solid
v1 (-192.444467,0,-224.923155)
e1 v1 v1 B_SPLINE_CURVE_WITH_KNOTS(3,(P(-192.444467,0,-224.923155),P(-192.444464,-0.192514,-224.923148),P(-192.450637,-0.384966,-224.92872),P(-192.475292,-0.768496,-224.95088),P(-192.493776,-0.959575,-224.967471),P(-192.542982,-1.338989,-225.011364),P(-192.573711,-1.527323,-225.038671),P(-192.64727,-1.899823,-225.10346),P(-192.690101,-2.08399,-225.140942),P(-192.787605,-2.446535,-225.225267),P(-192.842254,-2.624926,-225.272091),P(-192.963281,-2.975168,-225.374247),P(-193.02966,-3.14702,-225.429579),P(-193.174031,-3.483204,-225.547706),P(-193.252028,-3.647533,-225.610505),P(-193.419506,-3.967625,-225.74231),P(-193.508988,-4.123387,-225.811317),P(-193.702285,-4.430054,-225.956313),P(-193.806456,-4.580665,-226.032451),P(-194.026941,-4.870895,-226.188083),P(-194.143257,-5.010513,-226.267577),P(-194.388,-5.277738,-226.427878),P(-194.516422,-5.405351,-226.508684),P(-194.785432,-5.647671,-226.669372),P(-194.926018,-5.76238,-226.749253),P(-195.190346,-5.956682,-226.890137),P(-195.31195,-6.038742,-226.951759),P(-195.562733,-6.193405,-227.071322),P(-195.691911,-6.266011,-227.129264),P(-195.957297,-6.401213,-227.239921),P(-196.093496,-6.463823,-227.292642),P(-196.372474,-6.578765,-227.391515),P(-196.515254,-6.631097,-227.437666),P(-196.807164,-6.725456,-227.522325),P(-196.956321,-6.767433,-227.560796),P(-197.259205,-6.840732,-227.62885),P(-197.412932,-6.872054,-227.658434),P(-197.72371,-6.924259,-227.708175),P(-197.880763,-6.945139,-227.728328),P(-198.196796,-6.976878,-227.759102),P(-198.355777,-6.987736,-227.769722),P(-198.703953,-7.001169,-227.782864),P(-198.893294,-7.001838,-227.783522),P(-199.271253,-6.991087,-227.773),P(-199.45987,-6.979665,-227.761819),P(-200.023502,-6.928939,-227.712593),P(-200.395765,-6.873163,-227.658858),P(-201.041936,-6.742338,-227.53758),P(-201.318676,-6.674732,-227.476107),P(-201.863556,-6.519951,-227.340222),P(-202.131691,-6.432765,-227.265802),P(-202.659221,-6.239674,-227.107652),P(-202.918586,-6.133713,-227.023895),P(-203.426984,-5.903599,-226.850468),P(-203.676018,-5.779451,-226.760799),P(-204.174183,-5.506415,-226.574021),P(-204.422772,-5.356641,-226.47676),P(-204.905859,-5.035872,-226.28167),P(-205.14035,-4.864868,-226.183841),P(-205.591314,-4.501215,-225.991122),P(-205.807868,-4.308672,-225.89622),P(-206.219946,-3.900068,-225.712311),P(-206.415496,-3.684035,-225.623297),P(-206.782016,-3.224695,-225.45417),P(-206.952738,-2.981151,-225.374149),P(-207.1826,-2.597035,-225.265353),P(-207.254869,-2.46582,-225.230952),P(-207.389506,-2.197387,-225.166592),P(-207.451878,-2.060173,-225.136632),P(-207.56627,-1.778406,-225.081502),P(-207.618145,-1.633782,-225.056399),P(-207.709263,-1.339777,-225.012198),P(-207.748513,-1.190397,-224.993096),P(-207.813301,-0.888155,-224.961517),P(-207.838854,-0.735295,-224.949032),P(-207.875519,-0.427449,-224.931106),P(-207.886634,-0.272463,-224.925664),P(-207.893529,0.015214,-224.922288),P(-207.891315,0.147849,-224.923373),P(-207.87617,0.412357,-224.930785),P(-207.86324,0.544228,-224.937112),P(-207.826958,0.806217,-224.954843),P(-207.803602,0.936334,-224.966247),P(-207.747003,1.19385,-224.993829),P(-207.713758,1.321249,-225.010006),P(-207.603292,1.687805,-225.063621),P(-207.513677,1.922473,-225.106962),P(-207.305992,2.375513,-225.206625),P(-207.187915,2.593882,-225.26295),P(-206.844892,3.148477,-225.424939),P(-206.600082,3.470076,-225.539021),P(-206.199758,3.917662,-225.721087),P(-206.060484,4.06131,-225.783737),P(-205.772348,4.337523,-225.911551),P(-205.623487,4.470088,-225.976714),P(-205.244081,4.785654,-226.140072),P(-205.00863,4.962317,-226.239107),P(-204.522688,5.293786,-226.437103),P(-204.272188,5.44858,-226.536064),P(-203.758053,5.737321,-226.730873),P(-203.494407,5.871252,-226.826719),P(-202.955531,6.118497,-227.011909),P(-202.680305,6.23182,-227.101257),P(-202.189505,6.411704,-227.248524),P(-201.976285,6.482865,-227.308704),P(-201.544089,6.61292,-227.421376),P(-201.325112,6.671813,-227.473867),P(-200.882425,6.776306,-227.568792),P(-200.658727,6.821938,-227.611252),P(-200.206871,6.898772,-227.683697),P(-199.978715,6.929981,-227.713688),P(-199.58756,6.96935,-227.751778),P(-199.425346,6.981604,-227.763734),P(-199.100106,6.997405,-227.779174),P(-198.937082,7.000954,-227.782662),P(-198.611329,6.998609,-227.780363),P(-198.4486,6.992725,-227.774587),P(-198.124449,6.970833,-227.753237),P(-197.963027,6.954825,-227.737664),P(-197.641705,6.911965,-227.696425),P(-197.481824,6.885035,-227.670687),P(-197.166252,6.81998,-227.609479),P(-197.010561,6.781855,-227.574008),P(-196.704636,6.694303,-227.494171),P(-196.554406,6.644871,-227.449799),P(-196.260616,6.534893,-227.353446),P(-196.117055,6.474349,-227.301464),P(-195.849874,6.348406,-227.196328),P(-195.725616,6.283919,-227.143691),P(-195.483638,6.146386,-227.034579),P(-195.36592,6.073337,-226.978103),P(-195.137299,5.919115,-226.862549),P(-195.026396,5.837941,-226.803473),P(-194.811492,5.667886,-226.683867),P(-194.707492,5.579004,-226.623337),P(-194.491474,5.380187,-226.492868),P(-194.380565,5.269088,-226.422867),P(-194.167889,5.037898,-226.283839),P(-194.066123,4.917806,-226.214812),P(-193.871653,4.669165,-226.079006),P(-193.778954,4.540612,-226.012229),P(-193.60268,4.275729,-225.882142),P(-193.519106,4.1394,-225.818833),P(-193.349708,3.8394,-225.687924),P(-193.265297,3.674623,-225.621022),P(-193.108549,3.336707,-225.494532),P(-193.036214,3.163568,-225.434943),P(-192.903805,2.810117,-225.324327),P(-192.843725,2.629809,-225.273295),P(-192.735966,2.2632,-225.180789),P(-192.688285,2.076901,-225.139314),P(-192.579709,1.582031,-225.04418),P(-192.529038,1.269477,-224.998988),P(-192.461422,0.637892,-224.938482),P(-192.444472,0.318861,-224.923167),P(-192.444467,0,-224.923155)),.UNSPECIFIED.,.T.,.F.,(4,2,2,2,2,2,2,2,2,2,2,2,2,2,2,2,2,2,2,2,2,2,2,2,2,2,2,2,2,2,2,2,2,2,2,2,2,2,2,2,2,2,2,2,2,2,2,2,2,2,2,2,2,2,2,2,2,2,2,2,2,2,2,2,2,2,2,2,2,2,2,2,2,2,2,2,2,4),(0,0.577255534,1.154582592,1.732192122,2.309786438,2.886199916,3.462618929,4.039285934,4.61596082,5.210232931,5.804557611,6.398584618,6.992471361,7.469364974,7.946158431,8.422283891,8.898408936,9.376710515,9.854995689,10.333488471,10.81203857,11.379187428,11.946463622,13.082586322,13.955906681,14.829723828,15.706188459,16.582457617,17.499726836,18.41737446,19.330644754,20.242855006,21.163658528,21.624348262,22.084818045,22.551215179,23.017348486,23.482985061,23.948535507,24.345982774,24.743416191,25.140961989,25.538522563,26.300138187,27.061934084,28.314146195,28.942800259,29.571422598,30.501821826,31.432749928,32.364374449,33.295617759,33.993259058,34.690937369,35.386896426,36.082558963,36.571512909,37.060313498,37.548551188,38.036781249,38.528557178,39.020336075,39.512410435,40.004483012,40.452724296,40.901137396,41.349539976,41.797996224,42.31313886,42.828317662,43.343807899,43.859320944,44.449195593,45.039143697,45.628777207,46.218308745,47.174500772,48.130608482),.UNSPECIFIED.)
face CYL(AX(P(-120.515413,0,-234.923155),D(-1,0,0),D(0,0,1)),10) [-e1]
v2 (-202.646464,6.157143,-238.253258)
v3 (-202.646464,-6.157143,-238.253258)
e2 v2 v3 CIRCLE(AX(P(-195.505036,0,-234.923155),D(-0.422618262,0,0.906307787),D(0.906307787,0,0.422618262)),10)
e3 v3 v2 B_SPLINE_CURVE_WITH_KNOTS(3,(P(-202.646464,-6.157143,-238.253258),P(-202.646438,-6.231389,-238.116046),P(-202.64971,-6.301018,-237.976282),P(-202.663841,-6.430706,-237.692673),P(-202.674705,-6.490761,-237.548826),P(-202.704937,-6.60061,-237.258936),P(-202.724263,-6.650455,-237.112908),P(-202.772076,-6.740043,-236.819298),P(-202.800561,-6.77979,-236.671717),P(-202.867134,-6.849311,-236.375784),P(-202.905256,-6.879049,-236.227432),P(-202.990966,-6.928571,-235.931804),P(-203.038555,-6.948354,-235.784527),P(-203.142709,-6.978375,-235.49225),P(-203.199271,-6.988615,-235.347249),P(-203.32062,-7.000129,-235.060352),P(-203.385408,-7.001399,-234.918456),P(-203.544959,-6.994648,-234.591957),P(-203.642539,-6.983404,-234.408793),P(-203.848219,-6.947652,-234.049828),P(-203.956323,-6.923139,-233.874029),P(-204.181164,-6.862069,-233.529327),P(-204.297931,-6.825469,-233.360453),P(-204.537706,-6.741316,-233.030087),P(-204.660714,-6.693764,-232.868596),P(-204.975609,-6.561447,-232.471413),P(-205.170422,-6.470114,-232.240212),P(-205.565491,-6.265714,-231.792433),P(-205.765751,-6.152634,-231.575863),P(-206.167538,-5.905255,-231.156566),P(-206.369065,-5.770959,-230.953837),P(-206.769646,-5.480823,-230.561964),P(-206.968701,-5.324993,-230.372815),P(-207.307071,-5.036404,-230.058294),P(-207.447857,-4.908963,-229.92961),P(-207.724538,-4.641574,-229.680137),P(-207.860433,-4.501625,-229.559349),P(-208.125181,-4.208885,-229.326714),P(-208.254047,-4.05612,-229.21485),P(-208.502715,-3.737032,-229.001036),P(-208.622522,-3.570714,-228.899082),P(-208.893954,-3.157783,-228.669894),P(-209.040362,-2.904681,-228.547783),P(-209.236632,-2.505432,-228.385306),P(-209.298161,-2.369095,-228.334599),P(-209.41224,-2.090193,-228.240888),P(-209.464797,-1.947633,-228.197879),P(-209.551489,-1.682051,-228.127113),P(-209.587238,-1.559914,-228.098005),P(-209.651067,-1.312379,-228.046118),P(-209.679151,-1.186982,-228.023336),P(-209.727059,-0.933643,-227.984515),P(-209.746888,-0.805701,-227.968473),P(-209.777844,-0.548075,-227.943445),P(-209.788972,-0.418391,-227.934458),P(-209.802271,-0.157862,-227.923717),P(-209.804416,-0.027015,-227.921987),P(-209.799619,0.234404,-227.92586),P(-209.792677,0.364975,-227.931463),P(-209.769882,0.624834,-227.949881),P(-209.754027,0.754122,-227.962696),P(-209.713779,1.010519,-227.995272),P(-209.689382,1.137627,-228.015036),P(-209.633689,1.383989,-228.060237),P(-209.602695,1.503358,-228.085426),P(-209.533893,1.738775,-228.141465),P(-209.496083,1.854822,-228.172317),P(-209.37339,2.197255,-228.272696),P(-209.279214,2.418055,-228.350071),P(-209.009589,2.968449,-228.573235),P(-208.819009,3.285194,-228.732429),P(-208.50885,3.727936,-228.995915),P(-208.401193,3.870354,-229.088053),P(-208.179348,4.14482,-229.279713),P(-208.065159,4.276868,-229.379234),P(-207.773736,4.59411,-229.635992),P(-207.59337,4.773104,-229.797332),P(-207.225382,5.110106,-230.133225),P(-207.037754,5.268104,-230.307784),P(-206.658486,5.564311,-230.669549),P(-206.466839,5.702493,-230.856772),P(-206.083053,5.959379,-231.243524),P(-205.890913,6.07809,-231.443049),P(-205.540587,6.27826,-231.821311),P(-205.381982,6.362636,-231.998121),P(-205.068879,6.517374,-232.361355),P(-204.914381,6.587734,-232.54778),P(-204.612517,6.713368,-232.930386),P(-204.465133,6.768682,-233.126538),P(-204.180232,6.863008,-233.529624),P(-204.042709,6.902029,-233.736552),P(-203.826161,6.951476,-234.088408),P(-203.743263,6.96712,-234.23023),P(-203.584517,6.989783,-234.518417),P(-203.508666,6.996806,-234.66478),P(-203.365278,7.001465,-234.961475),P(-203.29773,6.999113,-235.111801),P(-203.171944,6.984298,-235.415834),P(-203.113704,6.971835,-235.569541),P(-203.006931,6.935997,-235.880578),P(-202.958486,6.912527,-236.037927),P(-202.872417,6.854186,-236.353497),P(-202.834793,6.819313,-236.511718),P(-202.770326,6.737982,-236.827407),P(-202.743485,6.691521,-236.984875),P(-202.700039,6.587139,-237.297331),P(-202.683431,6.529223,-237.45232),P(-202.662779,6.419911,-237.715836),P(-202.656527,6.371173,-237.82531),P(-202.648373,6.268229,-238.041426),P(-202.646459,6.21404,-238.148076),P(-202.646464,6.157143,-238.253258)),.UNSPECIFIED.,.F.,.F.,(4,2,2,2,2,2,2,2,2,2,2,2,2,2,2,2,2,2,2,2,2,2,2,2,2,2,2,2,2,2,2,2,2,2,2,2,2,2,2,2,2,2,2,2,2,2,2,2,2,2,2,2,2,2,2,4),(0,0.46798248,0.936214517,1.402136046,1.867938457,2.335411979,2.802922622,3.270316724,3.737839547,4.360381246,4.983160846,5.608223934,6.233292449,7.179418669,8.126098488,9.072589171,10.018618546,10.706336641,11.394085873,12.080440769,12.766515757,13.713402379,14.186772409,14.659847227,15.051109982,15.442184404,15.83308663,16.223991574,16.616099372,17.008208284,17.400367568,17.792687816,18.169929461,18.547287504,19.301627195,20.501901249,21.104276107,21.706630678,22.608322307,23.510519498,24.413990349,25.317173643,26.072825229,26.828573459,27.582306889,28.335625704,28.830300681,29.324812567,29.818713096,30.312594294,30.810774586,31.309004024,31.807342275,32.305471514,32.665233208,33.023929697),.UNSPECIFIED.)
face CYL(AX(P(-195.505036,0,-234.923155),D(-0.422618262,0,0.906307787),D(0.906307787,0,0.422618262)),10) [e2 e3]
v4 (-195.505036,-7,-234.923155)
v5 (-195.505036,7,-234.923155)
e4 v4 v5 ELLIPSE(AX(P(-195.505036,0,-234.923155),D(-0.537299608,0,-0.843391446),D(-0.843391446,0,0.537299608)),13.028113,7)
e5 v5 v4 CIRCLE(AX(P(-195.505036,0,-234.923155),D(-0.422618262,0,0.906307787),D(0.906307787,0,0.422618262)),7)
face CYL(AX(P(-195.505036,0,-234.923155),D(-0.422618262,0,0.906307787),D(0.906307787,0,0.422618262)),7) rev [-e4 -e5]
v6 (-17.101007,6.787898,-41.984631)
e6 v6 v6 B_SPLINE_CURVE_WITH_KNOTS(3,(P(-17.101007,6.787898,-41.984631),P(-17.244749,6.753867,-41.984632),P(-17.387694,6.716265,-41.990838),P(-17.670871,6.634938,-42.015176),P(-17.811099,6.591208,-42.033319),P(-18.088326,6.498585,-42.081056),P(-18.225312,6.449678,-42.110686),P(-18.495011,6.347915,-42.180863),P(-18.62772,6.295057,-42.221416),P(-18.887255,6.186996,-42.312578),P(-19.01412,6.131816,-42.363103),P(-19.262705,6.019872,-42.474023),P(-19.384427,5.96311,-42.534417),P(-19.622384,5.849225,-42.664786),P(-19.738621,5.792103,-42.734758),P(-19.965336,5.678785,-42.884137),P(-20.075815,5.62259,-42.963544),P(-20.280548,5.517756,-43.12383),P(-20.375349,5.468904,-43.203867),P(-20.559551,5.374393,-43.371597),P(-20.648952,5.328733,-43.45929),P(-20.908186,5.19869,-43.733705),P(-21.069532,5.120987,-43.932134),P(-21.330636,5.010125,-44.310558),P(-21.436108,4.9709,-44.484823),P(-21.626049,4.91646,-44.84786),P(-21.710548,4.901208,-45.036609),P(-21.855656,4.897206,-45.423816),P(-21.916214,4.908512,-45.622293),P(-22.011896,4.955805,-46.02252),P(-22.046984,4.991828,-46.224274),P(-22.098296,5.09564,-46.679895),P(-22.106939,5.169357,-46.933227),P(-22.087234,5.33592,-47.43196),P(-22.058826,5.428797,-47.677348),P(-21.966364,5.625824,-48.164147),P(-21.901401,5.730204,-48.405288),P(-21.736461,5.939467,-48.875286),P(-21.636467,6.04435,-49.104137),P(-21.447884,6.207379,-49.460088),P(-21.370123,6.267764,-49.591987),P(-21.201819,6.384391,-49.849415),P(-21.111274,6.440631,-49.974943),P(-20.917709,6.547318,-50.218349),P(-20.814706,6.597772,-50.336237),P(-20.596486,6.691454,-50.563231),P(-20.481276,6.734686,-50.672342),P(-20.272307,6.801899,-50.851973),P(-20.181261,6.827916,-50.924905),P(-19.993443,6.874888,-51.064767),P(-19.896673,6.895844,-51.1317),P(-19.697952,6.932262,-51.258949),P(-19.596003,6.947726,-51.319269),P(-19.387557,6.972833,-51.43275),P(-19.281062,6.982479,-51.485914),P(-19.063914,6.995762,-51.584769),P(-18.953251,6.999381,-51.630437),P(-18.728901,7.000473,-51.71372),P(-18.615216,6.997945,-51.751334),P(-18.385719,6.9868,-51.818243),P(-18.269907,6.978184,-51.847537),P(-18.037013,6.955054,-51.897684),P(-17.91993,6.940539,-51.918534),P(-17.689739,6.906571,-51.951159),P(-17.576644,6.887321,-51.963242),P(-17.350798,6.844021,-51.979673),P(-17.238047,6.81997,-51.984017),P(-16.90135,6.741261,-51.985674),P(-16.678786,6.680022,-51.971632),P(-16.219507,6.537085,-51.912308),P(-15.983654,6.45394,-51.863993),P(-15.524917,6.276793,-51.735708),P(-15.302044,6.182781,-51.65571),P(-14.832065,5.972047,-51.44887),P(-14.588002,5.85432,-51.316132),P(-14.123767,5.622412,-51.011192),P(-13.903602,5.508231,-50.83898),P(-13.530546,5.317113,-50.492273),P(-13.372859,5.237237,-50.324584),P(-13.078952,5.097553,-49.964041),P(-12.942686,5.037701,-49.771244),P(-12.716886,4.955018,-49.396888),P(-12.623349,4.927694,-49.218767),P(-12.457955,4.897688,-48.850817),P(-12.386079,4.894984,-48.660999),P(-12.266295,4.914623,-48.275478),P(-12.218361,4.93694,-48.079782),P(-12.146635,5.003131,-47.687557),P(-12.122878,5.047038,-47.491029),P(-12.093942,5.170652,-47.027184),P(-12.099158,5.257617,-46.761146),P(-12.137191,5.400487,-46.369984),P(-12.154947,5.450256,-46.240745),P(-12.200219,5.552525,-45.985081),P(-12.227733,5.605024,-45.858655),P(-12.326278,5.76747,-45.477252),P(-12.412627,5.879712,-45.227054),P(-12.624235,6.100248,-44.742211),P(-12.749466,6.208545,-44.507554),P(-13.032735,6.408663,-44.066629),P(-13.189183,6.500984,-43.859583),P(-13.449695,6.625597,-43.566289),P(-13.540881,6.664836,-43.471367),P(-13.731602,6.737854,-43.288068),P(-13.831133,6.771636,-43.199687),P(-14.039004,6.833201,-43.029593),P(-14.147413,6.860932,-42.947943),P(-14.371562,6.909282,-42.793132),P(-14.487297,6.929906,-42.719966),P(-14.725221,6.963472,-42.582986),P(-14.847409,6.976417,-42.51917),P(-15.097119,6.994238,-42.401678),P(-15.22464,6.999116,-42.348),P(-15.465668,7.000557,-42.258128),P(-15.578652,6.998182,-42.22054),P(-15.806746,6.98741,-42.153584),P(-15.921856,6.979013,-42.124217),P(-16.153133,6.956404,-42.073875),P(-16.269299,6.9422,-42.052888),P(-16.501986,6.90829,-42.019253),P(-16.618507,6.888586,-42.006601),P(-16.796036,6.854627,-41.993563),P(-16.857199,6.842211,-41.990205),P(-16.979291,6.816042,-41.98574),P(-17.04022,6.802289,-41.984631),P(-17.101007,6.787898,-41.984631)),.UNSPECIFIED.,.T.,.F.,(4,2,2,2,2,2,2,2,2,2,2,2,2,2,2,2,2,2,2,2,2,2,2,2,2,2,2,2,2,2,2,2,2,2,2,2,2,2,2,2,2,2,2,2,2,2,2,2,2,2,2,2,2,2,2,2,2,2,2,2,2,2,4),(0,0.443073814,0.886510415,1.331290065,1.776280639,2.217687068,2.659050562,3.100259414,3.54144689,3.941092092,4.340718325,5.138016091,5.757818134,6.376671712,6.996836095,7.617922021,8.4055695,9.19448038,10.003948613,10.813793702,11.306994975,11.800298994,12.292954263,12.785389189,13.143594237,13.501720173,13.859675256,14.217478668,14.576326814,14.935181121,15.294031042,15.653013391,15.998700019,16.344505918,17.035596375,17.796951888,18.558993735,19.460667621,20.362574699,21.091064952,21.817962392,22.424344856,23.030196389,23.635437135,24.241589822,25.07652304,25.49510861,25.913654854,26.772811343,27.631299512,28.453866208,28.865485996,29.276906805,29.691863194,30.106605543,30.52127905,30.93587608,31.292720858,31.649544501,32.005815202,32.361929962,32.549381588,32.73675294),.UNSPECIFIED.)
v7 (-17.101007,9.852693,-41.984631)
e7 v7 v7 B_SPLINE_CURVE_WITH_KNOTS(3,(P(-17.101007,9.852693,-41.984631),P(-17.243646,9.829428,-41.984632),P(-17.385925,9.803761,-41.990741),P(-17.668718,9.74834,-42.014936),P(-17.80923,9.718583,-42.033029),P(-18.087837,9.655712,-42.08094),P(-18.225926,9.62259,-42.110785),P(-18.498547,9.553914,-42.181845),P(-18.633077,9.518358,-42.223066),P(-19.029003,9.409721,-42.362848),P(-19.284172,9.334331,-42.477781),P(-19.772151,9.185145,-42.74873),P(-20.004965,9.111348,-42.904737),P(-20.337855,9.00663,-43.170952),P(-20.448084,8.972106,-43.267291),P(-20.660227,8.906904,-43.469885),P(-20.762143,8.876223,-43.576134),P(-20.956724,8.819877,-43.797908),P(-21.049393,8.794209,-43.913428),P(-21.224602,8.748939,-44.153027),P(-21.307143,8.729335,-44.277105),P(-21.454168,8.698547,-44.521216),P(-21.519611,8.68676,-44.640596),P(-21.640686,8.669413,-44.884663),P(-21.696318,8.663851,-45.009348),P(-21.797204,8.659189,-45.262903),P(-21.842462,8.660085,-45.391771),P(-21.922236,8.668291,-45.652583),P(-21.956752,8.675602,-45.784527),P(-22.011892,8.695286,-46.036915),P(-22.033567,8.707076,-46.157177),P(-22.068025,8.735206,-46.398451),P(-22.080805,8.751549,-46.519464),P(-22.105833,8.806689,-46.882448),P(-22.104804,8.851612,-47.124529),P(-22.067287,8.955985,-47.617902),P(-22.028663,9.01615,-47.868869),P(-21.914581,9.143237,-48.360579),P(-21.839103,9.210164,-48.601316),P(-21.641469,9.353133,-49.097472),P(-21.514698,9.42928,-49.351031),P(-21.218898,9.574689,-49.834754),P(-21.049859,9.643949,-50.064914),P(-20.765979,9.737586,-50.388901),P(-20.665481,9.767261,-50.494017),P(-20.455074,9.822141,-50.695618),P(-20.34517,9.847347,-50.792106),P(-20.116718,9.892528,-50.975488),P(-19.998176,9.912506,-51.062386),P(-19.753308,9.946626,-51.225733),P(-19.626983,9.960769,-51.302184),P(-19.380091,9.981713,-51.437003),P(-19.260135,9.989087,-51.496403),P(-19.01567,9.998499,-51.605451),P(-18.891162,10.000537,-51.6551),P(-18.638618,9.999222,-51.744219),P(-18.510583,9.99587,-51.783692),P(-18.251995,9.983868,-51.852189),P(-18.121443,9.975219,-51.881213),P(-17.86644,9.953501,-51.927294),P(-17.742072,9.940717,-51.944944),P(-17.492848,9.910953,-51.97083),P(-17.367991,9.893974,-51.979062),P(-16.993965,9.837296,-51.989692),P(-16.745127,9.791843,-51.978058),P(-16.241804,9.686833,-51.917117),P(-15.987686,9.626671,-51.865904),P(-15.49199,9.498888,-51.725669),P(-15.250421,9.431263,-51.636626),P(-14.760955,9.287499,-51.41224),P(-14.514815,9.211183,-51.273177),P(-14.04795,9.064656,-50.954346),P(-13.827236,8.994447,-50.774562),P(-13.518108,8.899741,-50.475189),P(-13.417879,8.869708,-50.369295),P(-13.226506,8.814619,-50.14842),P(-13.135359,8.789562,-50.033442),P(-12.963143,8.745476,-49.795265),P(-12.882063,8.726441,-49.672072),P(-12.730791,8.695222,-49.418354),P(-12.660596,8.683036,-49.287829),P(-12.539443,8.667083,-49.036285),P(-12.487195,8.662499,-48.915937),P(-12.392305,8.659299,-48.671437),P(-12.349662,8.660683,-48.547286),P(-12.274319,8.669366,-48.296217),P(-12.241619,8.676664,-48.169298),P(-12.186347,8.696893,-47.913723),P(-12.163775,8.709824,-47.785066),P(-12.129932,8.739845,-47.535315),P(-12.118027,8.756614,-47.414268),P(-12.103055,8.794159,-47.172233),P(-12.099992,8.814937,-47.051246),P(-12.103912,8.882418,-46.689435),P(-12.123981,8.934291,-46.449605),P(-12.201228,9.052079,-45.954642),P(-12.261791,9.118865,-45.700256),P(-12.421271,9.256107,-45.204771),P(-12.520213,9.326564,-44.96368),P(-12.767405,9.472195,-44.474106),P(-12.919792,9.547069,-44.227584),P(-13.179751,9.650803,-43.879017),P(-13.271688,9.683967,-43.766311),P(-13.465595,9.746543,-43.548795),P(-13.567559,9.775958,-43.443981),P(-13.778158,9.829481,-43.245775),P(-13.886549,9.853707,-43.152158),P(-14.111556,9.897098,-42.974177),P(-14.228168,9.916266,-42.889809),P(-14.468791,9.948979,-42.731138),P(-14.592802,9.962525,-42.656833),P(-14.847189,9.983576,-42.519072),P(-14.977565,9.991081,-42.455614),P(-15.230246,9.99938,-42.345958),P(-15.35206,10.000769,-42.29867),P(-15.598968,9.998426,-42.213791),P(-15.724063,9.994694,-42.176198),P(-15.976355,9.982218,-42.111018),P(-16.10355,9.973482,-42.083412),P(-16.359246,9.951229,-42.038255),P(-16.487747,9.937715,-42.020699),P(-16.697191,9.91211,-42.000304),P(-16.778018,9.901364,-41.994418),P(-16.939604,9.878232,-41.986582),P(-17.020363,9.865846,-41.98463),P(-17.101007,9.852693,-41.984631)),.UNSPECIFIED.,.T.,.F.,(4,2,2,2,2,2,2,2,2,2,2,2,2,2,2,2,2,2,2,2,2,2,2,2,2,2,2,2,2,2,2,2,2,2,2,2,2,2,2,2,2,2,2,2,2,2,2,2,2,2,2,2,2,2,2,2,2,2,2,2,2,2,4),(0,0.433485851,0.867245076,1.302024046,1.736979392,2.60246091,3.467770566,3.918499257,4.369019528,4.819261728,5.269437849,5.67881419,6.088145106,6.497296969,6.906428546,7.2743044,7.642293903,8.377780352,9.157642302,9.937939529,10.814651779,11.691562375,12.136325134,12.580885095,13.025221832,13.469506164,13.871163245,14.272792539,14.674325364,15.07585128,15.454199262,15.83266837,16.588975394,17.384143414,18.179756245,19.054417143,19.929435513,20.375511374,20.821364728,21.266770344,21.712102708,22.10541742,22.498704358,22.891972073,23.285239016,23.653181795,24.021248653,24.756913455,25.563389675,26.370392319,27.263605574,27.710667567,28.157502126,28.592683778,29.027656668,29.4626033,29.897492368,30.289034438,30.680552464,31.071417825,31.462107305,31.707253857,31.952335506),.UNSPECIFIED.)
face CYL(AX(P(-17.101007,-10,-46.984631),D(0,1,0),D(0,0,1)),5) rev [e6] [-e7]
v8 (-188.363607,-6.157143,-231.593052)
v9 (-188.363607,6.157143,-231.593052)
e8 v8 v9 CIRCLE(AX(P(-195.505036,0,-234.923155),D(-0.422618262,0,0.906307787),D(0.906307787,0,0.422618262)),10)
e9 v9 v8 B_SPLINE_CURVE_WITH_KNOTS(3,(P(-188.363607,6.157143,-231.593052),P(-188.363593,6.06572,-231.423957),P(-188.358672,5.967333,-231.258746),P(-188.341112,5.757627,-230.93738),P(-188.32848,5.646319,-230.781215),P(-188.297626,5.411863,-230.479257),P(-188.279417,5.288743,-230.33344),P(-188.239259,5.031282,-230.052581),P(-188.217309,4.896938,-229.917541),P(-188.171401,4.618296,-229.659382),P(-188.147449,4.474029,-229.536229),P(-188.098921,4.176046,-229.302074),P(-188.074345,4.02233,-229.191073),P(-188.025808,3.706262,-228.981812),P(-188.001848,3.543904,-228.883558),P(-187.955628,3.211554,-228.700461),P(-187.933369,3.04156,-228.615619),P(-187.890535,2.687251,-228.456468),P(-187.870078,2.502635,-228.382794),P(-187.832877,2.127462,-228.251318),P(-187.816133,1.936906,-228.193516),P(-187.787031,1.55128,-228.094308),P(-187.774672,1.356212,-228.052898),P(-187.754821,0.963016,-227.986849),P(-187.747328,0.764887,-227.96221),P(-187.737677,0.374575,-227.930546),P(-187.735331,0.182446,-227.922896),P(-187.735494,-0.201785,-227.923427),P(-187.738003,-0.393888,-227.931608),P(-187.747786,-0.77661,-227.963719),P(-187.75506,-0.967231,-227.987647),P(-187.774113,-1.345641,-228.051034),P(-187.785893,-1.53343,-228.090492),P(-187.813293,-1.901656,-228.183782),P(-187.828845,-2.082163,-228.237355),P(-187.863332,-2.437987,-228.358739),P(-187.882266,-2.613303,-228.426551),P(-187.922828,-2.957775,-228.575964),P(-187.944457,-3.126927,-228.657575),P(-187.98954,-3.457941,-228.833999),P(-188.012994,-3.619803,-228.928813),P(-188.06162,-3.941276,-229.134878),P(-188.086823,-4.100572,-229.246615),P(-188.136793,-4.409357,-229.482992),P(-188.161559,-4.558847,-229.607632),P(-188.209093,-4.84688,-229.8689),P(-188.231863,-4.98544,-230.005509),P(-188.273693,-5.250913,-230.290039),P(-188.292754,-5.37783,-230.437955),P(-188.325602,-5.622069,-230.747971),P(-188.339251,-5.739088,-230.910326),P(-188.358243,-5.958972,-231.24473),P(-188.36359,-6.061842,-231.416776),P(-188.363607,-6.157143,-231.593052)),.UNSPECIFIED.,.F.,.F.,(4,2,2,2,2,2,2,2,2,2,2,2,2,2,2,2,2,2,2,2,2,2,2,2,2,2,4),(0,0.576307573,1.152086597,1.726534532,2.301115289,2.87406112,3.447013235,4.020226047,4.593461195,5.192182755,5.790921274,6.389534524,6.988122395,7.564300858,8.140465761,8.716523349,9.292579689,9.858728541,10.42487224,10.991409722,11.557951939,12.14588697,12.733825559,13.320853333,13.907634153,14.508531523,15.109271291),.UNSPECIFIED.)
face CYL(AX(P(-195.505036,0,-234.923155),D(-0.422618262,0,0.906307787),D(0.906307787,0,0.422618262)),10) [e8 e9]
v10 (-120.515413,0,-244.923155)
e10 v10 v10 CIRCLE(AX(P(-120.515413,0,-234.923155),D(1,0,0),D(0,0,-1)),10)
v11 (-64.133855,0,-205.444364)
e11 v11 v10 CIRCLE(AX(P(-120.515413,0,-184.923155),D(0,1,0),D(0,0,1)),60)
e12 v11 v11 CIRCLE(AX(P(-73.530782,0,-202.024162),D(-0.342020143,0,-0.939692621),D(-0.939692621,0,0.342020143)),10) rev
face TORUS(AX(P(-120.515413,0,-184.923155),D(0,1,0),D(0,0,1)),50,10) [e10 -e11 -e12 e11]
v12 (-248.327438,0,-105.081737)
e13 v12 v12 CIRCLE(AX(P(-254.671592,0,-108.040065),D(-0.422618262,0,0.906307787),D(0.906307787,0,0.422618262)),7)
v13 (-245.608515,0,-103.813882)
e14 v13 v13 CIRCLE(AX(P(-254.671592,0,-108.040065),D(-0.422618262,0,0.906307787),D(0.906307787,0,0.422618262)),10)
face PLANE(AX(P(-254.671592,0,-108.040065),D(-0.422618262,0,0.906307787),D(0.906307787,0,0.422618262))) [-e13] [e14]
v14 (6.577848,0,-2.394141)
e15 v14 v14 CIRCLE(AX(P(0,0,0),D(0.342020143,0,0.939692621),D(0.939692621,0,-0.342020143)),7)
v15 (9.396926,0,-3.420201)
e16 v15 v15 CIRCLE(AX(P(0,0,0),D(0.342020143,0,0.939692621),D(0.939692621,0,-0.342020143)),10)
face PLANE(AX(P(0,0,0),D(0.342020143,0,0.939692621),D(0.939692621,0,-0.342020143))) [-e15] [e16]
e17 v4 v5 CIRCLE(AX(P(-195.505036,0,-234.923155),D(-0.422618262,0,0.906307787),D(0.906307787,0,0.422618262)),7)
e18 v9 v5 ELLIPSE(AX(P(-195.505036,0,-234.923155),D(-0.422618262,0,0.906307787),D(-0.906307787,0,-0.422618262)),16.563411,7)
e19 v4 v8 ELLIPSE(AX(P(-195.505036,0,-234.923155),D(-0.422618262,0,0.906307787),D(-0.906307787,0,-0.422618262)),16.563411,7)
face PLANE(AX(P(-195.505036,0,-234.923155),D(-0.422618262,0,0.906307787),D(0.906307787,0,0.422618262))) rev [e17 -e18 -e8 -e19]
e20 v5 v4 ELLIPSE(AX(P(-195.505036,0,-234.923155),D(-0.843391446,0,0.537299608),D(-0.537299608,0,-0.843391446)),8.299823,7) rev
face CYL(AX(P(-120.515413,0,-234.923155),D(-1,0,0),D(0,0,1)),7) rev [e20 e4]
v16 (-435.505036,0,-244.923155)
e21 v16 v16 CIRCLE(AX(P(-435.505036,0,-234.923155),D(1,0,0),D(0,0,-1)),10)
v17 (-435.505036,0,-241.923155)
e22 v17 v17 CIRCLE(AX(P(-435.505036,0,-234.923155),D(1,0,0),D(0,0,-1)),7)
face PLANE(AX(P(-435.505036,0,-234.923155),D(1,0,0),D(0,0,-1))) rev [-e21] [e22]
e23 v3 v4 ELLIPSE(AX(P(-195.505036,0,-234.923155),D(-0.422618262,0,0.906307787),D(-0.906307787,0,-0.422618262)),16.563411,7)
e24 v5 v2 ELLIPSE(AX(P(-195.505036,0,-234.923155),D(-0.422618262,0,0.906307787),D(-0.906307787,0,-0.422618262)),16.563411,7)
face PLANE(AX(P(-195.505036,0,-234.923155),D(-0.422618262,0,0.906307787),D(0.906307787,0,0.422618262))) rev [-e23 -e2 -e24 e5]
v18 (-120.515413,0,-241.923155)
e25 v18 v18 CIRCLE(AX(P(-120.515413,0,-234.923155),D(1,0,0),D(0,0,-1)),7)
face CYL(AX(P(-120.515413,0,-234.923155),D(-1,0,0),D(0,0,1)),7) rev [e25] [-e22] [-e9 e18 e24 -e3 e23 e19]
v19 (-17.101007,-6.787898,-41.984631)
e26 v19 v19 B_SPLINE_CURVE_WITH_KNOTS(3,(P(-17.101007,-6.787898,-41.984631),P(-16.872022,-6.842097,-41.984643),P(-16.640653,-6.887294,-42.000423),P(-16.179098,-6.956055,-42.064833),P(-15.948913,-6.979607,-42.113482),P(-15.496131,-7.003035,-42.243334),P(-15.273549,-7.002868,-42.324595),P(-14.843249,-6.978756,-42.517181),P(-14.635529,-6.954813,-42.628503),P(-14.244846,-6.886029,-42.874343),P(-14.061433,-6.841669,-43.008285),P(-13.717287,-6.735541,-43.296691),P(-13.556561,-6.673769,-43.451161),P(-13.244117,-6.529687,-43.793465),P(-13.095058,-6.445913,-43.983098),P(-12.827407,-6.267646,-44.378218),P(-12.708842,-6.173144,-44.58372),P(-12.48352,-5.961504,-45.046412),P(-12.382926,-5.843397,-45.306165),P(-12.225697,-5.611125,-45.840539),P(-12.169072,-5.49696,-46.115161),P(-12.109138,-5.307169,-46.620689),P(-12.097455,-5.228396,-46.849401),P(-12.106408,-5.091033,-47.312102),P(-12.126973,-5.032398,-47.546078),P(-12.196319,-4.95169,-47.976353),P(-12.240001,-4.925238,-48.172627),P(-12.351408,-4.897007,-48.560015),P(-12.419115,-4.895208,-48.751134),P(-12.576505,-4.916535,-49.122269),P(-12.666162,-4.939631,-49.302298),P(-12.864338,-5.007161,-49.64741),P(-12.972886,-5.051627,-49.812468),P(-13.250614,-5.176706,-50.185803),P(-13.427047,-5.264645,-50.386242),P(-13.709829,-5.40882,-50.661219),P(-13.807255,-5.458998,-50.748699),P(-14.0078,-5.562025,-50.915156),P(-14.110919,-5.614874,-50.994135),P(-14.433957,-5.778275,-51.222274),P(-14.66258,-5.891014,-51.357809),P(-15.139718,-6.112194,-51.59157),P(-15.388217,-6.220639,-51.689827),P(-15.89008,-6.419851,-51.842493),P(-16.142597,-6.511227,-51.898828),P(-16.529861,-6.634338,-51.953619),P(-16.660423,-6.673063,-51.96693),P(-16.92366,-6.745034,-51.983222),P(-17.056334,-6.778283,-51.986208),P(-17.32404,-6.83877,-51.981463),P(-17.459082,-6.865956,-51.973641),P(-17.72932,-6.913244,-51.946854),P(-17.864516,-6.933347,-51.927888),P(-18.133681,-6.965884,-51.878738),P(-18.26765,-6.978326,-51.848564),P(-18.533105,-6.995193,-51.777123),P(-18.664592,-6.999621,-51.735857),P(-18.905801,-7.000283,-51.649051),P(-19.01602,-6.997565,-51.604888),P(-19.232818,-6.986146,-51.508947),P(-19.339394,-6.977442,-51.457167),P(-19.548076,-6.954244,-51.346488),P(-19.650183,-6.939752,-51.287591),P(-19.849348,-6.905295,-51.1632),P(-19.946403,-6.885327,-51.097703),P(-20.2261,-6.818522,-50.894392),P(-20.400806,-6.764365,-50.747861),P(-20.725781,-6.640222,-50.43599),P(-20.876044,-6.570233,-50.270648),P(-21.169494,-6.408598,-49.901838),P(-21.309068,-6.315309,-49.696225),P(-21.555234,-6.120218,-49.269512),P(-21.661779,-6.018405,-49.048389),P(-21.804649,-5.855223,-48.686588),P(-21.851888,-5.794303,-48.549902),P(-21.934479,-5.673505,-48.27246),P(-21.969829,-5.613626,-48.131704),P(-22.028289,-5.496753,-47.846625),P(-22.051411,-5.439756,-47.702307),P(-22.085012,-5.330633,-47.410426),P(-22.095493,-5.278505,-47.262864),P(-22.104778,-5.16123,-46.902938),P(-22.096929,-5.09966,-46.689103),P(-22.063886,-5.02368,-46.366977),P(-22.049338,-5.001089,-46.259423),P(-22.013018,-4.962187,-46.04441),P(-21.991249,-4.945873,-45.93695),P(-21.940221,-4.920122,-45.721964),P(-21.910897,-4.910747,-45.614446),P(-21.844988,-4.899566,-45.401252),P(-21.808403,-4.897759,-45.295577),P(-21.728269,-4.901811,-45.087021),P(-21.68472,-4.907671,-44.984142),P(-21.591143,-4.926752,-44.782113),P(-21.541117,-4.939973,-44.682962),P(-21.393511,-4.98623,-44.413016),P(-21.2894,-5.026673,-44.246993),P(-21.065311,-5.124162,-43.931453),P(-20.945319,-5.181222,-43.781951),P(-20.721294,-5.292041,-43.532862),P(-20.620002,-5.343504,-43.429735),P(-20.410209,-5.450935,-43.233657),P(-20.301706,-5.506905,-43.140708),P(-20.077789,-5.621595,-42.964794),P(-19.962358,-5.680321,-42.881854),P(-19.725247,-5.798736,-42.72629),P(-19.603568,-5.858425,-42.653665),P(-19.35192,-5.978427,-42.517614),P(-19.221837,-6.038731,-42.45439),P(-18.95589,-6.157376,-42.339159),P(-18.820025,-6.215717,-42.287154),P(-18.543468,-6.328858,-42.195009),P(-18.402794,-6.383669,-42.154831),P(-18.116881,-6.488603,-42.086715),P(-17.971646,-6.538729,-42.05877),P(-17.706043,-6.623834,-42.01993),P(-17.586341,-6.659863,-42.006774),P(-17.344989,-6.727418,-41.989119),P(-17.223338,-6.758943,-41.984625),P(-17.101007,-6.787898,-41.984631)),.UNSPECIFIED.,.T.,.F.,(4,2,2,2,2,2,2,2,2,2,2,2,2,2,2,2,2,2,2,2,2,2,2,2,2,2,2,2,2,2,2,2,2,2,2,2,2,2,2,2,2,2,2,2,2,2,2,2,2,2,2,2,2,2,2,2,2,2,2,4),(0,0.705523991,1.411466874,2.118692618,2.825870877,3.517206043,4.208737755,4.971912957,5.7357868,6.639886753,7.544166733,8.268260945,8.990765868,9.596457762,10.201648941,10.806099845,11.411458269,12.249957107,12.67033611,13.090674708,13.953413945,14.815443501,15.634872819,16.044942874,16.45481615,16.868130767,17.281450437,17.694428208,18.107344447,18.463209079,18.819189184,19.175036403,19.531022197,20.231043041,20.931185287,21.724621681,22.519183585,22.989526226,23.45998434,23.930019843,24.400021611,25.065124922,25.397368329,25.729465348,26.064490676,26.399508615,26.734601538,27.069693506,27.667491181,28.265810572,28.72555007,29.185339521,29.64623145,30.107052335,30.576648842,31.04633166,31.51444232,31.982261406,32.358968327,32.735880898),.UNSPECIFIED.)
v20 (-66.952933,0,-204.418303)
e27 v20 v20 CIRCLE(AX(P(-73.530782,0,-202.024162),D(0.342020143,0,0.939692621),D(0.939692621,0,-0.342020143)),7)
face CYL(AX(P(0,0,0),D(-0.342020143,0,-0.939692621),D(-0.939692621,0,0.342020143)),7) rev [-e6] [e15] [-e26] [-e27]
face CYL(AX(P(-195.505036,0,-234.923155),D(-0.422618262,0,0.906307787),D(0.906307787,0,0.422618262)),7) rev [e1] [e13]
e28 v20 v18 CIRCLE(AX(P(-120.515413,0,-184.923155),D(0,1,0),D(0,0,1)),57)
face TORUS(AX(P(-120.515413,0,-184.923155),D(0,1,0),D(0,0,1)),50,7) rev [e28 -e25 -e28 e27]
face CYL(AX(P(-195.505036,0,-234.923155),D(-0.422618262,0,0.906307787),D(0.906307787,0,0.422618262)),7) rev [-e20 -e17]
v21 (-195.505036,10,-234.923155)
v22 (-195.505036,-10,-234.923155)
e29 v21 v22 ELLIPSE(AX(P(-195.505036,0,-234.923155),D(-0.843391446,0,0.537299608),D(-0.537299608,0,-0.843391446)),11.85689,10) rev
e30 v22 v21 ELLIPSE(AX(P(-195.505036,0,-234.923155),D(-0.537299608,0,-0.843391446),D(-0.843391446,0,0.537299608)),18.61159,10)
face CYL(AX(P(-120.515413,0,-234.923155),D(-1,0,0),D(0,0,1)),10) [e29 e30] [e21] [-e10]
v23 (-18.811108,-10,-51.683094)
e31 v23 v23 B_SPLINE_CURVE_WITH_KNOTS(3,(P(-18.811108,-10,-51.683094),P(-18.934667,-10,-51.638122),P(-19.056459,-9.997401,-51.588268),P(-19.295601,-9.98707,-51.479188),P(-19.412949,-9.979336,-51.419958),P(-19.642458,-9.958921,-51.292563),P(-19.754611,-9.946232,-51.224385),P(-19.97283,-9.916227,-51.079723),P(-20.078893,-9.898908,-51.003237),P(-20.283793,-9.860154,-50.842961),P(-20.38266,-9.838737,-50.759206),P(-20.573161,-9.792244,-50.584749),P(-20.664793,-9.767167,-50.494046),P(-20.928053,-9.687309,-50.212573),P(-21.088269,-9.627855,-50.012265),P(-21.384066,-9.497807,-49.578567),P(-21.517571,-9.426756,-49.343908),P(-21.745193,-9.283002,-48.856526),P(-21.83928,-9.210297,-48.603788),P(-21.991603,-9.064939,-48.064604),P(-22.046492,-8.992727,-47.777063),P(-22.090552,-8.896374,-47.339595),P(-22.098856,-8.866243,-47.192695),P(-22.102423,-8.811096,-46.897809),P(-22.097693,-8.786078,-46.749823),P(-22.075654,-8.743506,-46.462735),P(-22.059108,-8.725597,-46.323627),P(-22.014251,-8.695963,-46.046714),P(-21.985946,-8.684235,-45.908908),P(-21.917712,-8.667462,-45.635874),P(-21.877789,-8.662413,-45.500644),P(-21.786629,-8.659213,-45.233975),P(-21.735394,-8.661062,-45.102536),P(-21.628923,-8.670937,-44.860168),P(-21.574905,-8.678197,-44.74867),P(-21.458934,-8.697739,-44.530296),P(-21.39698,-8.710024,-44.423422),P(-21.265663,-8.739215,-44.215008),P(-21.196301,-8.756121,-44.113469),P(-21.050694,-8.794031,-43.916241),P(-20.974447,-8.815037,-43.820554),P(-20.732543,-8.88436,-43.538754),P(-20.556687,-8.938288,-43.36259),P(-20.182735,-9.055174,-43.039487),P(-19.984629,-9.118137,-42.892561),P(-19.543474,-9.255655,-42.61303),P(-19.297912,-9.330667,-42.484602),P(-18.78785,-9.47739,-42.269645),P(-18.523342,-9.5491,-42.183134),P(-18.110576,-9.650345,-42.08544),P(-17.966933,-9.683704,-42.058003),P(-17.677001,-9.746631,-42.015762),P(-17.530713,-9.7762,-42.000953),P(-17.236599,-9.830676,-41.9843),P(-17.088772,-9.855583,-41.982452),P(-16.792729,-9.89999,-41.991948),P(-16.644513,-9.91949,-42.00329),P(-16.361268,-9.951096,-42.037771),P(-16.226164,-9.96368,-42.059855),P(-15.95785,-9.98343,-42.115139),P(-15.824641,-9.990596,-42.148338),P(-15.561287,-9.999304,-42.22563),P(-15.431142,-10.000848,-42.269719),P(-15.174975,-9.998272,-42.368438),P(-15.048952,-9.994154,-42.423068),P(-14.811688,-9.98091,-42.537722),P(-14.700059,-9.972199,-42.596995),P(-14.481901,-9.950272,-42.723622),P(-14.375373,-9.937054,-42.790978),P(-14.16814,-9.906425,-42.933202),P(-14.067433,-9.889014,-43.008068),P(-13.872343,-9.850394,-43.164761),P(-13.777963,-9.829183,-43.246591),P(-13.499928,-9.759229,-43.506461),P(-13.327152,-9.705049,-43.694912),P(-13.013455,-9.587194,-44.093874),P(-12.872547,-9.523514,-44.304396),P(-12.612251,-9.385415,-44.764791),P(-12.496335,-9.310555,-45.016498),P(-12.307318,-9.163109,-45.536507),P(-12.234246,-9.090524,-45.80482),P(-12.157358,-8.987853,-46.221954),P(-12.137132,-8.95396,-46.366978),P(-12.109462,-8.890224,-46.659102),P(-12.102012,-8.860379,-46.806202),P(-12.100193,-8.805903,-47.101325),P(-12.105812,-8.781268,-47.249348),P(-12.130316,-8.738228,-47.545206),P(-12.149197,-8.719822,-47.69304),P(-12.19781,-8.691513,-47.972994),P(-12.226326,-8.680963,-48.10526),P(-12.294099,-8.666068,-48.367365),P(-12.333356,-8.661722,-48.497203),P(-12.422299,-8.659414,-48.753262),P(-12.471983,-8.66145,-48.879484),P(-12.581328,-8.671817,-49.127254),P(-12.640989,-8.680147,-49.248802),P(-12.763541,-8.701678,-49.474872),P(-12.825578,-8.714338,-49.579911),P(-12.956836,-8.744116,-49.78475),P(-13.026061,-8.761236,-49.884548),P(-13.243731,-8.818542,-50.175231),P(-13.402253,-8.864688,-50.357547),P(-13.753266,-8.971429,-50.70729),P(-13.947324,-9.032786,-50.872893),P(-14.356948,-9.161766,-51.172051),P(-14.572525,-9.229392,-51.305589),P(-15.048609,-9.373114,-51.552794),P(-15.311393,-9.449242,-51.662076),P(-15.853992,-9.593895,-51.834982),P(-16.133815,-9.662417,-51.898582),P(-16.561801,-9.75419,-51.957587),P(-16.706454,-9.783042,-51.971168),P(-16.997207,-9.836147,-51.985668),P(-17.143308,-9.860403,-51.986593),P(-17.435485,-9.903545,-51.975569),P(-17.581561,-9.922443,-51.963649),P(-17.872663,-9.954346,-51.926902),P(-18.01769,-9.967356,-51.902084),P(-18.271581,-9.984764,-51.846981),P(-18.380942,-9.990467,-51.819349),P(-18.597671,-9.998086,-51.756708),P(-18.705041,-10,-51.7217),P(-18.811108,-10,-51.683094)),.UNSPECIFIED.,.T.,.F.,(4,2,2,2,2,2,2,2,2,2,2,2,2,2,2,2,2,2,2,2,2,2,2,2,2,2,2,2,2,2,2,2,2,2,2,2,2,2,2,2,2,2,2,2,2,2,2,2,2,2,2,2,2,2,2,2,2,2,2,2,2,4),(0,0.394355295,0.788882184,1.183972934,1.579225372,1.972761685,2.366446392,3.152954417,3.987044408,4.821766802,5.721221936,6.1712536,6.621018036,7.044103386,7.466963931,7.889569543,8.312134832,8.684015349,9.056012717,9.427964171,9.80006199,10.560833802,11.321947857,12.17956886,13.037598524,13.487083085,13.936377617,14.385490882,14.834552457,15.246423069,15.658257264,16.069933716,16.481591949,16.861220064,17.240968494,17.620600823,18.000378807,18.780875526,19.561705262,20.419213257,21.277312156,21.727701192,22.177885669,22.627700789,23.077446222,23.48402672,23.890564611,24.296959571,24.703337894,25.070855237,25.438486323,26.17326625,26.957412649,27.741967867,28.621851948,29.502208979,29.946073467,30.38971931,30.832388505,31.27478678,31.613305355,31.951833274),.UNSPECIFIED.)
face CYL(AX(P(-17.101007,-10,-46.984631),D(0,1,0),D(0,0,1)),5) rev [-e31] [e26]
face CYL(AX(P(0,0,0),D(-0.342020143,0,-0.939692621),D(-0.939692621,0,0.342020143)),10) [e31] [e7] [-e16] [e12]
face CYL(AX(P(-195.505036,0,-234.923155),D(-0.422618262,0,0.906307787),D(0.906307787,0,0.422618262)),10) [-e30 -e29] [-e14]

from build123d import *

# Parameters (mm, degrees)
SWEEP_THIN2_PROFILE_R   = 10
SWEEP_THIN2_PROFILE_R_2 = 7
CUT_EXTRUDE1_DEPTH      = 500.751926697
CUT_EXTRUDE1_DEPTH_BACK = 500.751926697
SKETCH22_R              = 5
SWEEP_THIN3_START       = -9.711313495
SWEEP_THIN3_OUTLINE_R   = 10
SWEEP_THIN3_OUTLINE_R_2 = 7
SWEEP_THIN3_DEPTH       = 140


with BuildPart() as part:
    # Sweep-Thin2: sweep along a path in Sketch1
    with BuildLine(Plane(origin=(0, 0, 0), x_dir=(1, 0, 0), z_dir=(0, 1, 0))) as sweep_thin2_path:
        Line((0, 0), (-73.530781703, 202.024162363))
        ThreePointArc((-73.530781703, 202.024162363), (-91.836590924, 225.880757411), (-120.515412742, 234.923155196))
        Line((-120.515412742, 234.923155196), (-435.505035831, 234.923155196))
    # Sweep-Thin2 profile (on start of the path) → Sweep-Thin2 (sweep)
    with BuildSketch(Plane(origin=(0, 0, 0), x_dir=(-0.9396926207859093, 0, 0.3420201433256662), z_dir=(-0.3420201433256662, 0, -0.9396926207859093))):
        Circle(SWEEP_THIN2_PROFILE_R)
        Circle(SWEEP_THIN2_PROFILE_R_2, mode=Mode.SUBTRACT)
    sweep(path=sweep_thin2_path.line)

    # Sketch22 → Cut-Extrude1 (cut, two sides: drawn at the far end of the back side and taken through both)
    with BuildSketch(Plane(origin=(0, 0, 0), x_dir=(1, 0, 0), z_dir=(0, 1, 0)).offset(-CUT_EXTRUDE1_DEPTH_BACK)):
        with Locations(Location((-17.101007166, 46.984631039, 0), (0, 0, 270))):
            Circle(SKETCH22_R)
    extrude(amount=CUT_EXTRUDE1_DEPTH + CUT_EXTRUDE1_DEPTH_BACK, mode=Mode.SUBTRACT)

    # Sweep-Thin3: read off the stored shape, not the designer's step
    # Sweep-Thin3 outline → Sweep-Thin3 (add)
    with BuildSketch(Plane(origin=(0, 0, 0), x_dir=(0.906307787036651, 0, 0.42261826174069705), z_dir=(0.42261826174069705, 0, -0.9063077870366512)).offset(SWEEP_THIN3_START)):
        with Locations((-276.470551871, 0)):
            Circle(SWEEP_THIN3_OUTLINE_R)
        with Locations((-276.470551871, 0)):
            Circle(SWEEP_THIN3_OUTLINE_R_2, mode=Mode.SUBTRACT)
    extrude(amount=SWEEP_THIN3_DEPTH)


solid = part.part
